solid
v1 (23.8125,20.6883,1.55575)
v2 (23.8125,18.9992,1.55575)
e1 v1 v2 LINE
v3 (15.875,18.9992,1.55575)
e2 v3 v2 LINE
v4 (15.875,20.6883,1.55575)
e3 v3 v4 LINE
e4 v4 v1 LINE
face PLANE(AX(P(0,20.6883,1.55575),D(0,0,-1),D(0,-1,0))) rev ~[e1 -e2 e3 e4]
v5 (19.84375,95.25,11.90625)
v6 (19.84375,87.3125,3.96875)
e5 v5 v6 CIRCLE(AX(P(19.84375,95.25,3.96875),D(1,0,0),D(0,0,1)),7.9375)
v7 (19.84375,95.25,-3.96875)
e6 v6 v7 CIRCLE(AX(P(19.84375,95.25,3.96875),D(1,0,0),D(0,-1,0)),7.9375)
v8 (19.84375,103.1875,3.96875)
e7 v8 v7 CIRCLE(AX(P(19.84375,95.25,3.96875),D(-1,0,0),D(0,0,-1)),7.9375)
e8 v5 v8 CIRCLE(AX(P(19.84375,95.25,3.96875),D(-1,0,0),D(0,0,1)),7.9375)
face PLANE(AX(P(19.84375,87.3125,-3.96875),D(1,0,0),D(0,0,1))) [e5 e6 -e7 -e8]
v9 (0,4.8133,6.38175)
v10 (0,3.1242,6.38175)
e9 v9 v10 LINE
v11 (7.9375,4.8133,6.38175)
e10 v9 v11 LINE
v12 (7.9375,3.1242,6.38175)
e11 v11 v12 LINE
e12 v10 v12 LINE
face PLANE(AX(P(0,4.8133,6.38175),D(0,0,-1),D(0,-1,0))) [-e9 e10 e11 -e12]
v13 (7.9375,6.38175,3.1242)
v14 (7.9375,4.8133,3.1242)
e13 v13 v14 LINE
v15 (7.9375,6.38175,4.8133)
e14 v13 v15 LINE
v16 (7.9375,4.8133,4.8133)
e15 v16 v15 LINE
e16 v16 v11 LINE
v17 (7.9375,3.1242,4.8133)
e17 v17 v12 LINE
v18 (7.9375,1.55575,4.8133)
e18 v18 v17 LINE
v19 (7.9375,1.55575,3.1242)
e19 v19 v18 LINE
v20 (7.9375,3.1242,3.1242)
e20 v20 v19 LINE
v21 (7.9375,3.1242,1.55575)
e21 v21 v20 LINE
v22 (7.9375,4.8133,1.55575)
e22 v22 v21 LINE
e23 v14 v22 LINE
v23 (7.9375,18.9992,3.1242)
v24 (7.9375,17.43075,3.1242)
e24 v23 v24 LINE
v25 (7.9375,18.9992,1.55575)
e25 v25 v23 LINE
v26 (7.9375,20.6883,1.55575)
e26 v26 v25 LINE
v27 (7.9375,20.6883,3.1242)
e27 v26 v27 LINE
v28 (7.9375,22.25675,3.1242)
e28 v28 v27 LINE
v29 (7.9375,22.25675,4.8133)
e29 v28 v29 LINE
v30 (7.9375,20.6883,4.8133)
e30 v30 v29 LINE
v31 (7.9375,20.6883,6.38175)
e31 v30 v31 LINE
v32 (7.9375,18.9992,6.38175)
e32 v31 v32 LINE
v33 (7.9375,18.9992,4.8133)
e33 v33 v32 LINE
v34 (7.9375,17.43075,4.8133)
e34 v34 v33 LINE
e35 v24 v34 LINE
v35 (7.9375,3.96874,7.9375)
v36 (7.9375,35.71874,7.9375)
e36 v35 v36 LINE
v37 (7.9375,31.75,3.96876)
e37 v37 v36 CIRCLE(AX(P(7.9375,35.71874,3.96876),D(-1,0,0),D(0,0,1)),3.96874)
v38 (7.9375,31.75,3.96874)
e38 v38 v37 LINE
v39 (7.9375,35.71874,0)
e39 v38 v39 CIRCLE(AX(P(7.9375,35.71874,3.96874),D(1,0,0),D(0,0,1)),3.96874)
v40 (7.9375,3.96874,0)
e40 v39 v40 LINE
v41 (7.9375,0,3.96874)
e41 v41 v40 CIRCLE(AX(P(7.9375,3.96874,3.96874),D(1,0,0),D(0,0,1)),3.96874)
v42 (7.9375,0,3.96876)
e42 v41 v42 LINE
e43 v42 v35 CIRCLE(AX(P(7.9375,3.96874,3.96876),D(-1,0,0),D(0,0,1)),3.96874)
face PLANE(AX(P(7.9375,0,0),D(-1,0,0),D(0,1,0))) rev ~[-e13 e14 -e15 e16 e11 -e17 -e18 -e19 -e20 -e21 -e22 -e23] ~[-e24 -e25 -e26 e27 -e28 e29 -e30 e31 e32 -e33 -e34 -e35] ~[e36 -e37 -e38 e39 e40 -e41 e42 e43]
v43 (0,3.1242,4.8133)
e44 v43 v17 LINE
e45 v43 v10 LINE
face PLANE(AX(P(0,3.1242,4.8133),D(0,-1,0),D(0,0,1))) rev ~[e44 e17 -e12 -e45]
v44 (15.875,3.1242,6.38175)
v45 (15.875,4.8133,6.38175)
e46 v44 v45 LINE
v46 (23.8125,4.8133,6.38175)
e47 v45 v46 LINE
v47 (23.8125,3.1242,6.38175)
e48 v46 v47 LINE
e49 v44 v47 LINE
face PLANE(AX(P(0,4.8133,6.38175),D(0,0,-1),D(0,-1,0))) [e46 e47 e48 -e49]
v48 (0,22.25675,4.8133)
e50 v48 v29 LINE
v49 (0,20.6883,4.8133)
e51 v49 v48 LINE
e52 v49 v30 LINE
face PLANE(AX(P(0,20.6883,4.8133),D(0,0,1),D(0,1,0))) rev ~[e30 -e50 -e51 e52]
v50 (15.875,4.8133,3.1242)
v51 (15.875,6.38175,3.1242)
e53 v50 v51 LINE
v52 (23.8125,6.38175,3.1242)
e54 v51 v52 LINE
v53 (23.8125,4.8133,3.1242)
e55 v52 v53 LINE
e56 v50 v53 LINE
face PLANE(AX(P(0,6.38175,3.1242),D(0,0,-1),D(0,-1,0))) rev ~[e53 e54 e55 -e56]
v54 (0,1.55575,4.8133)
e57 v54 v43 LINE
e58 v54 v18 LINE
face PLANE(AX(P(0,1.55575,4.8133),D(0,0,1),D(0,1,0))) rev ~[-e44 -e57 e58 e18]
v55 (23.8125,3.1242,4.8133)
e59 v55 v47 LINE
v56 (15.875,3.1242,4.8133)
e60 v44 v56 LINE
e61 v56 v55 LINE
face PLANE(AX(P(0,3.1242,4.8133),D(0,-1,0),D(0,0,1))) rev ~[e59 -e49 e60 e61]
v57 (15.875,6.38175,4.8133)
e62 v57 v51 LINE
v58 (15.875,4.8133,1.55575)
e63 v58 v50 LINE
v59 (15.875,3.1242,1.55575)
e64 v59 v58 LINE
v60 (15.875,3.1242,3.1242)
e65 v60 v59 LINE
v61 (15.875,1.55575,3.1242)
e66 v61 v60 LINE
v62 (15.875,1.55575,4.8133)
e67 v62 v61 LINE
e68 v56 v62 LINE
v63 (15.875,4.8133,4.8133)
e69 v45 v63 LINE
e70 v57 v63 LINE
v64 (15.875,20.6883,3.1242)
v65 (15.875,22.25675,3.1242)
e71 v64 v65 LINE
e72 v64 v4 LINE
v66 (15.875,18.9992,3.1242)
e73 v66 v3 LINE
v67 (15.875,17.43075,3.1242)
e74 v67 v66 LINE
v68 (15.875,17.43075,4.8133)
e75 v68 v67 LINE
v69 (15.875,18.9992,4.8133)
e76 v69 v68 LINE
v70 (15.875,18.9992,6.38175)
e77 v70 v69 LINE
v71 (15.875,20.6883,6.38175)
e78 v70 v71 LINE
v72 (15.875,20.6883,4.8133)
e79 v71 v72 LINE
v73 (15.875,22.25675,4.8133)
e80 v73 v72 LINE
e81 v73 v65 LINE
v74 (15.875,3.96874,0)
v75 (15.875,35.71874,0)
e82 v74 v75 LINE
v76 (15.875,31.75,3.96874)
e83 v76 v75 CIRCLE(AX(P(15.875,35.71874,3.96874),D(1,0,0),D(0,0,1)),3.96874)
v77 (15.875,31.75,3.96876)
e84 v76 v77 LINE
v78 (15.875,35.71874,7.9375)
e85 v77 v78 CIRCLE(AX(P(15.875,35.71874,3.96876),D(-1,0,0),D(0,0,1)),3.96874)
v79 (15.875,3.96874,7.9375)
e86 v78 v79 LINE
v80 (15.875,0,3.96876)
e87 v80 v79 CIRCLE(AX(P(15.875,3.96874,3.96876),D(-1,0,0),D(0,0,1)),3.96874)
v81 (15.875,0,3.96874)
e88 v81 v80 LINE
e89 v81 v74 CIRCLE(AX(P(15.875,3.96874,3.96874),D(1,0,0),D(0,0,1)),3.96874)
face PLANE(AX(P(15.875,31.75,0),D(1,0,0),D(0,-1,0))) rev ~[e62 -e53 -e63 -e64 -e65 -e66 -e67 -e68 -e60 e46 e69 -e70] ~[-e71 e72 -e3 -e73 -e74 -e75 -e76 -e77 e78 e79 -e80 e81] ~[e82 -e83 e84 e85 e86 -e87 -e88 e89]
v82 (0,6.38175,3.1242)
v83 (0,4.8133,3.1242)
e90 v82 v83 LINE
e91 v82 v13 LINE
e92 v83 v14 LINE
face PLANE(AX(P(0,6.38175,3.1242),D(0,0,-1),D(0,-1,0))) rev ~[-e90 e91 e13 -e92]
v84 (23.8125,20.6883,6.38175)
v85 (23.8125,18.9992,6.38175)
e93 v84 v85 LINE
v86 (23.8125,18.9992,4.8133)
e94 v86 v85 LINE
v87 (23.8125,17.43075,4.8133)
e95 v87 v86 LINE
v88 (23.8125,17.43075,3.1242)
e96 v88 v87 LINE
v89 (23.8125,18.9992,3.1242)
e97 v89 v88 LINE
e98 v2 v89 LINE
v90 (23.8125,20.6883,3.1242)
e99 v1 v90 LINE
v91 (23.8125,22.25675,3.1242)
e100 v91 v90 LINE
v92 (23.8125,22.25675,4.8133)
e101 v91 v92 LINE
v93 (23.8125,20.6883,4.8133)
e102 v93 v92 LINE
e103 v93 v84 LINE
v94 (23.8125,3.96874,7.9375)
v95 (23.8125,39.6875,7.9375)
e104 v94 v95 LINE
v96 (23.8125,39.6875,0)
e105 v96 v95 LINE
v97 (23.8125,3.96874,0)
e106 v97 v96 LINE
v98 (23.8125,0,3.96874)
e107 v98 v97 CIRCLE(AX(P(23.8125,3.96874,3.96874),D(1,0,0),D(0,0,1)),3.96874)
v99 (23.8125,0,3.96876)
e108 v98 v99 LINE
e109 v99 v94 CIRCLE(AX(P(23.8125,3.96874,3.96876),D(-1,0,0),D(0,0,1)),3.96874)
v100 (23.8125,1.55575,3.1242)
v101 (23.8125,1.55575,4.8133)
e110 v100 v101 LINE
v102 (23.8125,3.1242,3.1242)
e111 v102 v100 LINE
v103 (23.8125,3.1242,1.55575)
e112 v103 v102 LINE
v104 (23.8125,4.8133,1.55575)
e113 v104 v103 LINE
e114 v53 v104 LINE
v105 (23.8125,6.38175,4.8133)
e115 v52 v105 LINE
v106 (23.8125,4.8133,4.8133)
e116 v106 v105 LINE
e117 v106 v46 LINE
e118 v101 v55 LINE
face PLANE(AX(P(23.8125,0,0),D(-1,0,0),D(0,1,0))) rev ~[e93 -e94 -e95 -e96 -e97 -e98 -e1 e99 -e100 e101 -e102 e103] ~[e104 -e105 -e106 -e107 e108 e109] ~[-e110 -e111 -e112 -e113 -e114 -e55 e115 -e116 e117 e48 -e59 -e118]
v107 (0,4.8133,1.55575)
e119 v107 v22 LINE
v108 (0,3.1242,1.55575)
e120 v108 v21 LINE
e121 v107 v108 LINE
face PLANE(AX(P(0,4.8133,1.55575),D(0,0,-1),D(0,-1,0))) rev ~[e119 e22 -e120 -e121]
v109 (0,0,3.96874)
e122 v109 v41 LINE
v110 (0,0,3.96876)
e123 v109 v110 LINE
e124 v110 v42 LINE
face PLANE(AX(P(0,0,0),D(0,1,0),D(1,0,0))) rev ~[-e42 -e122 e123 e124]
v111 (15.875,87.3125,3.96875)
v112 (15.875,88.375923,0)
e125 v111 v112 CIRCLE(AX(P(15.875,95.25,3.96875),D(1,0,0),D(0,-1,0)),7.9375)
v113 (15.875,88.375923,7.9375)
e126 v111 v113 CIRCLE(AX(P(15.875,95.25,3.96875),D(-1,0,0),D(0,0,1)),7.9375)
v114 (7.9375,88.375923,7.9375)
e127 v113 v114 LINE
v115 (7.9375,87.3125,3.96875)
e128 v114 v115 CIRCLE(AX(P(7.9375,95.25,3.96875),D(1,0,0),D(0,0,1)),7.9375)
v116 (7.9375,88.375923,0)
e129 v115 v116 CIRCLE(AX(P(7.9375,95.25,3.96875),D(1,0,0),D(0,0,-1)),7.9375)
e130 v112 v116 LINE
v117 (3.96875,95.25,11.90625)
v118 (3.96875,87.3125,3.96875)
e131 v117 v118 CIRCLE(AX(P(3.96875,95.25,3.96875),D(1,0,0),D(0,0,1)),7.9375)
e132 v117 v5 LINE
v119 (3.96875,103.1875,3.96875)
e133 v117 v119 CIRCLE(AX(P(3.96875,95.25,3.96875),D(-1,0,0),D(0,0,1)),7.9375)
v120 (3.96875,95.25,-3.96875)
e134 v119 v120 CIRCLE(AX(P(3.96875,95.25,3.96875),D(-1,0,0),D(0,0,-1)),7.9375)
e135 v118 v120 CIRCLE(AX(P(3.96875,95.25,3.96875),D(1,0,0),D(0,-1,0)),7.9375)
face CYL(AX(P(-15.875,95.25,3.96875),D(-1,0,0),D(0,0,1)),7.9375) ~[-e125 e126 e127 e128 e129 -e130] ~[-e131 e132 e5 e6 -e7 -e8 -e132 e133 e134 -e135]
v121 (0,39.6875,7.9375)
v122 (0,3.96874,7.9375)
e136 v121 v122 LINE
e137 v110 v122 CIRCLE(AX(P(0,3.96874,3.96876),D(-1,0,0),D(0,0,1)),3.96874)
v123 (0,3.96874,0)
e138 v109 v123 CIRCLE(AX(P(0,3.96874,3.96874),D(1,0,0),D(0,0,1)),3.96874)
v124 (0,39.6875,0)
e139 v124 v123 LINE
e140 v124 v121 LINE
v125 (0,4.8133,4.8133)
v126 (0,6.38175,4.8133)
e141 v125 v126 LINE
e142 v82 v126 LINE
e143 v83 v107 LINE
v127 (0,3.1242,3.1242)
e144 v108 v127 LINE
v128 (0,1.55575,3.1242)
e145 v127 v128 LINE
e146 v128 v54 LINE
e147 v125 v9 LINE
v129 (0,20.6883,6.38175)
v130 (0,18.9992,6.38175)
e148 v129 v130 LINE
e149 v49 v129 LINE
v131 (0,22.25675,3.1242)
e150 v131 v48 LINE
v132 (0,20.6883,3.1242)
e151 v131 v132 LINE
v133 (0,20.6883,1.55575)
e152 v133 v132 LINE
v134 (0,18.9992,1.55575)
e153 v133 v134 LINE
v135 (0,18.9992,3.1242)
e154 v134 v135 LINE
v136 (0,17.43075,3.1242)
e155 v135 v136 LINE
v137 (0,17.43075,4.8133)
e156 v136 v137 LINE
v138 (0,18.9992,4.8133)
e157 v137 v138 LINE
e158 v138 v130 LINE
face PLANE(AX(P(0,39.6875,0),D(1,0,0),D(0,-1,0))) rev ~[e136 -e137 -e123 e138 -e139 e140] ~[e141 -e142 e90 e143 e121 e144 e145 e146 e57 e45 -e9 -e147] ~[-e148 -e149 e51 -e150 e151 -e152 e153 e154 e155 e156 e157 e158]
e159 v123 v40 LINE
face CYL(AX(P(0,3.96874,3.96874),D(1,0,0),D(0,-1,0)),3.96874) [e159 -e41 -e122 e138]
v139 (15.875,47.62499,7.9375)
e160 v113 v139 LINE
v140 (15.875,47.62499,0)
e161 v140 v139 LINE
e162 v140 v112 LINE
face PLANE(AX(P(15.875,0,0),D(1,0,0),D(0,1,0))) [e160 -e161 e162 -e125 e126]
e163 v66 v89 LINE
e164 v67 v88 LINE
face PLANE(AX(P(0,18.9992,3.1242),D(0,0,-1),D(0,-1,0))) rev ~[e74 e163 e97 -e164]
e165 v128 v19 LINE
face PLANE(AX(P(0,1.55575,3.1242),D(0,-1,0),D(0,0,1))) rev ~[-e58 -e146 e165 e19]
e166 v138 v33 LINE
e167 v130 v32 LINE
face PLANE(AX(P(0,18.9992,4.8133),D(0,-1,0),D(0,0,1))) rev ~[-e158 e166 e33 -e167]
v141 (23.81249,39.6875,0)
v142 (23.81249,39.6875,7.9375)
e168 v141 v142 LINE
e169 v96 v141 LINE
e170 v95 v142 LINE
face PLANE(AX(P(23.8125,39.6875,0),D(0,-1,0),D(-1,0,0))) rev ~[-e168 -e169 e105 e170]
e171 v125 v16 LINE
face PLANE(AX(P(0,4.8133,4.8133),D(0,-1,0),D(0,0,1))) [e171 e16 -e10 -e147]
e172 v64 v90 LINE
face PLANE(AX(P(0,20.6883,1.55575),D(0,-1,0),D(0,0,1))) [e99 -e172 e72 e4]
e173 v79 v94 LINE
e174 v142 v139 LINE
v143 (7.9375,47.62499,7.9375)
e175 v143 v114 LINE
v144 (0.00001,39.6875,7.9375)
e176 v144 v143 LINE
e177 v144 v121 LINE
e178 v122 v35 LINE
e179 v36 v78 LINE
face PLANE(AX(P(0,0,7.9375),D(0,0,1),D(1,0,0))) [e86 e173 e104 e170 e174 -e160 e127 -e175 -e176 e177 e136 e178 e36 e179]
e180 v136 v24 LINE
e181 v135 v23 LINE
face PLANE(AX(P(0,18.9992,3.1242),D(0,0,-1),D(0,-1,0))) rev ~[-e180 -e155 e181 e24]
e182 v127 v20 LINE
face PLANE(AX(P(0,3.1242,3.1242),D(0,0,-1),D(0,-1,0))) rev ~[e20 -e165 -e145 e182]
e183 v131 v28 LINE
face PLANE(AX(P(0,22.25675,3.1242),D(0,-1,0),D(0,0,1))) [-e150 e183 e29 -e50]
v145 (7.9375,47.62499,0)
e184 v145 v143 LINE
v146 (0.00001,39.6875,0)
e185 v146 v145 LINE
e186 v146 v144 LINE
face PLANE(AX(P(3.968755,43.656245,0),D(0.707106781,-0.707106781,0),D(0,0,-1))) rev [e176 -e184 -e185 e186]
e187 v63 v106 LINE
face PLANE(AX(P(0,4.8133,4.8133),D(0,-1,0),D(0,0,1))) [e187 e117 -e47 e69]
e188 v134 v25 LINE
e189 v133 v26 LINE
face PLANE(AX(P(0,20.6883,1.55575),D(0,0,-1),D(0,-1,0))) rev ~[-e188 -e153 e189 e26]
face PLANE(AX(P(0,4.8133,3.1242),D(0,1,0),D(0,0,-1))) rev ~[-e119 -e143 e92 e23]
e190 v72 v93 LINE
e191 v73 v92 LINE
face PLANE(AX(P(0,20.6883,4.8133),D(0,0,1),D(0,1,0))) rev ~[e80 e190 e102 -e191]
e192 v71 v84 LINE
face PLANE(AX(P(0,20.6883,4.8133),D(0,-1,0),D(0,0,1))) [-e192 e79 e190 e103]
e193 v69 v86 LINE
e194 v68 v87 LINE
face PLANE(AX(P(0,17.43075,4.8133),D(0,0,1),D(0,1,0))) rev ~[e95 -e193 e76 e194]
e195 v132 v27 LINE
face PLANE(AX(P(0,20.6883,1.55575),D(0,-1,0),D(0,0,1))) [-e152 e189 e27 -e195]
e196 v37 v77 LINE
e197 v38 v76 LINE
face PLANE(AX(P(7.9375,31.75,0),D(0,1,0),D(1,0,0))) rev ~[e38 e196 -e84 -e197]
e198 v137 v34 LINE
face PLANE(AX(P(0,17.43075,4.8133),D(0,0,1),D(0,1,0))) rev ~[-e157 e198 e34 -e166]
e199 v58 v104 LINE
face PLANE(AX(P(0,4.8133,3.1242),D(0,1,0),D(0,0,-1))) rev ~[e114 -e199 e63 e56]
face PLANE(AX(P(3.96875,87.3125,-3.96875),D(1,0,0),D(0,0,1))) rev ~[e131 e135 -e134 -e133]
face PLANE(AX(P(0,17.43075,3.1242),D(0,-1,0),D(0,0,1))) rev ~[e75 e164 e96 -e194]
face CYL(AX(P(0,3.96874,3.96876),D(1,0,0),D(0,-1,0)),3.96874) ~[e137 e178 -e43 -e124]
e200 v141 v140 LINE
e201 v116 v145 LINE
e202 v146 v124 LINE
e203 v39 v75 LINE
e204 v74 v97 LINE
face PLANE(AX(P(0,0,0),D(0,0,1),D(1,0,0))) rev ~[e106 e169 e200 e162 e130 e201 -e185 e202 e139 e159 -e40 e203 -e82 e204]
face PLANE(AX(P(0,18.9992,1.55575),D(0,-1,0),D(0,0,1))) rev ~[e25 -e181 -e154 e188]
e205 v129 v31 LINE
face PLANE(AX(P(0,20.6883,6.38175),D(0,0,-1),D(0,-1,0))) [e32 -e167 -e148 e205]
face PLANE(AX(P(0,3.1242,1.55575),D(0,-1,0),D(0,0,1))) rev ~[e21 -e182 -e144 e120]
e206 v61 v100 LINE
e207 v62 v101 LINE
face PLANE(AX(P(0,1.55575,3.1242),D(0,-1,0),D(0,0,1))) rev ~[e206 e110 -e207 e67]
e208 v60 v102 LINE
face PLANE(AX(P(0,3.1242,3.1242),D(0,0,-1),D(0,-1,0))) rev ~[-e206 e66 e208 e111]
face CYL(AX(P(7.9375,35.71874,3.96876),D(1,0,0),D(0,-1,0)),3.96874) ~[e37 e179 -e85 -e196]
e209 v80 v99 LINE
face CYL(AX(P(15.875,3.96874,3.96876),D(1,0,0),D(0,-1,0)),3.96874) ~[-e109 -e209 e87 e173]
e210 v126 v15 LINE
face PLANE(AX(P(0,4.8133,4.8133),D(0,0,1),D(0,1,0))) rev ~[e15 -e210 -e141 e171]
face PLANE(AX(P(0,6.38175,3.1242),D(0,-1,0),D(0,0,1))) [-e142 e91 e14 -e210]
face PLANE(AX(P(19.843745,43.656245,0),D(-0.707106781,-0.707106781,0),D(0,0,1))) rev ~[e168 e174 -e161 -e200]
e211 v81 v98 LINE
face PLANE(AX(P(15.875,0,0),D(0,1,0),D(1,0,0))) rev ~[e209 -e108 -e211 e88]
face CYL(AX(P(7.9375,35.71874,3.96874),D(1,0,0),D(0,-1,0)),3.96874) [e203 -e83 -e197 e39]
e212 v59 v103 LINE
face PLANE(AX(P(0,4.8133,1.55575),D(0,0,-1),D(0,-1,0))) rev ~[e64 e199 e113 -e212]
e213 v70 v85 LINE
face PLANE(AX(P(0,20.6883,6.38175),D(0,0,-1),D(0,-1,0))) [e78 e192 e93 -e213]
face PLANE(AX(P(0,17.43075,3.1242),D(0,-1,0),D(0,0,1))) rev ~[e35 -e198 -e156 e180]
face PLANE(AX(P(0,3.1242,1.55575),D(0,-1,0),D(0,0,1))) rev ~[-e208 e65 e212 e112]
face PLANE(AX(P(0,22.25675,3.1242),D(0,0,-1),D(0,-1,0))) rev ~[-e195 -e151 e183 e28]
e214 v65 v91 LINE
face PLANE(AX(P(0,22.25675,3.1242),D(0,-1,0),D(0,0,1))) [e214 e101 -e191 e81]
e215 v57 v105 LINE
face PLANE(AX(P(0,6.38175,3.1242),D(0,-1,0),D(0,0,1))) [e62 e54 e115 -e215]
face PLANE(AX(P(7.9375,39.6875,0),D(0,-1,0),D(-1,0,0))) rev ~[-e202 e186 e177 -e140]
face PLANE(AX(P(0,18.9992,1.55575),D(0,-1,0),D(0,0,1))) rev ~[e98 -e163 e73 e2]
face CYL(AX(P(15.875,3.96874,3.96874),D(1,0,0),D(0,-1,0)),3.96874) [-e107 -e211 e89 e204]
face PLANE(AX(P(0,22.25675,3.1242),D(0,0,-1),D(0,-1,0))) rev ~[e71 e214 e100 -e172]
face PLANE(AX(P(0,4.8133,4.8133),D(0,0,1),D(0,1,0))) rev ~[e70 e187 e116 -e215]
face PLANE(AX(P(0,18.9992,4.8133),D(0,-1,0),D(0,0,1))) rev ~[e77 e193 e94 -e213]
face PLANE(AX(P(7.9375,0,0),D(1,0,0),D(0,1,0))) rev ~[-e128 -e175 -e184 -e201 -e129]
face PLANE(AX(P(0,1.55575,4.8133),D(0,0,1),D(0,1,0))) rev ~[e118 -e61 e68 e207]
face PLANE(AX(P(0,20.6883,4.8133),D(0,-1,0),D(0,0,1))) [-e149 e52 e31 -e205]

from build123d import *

# Parameters (mm, degrees)
F1_DEPTH     = 7.9375
F2_R         = 3.96874
F3_W         = 1.56845
F3_H         = 1.6891
F3_W_2       = 1.6891
F3_H_2       = 1.56845
F4_DEPTH     = 130
F5_SIZE      = 7.93749
F6_W         = 15.875
F6_H         = 15.875
F7_DEPTH     = 15.875
F8_T1_DEPTH  = 55.5625
F8_T6_DEPTH  = 55.5625
F8_T12_DEPTH = 55.5625
F8_T18_DEPTH = 55.5625
F8_T25_DEPTH = 55.5625
F8_T31_DEPTH = 55.5625
F8_T37_DEPTH = 55.5625
F8_T43_DEPTH = 55.5625
F8_T49_DEPTH = 55.5625
F8_T56_DEPTH = 55.5625
F8_T62_DEPTH = 55.5625


# Not quite as in the source:
# - a fillet or chamfer that OpenCascade refuses, or shapes differently, is made with other operations: its cross-section is extruded or revolved along the edge and cut away or added
# - a fillet or chamfer is up to 0.001 mm smaller than in the source, because OpenCascade refuses the exact size
# - an extrude ends at something that could not be found from the text; its depth is read off the source's solid


with BuildPart() as f1:
    # F0 (on Top) → F1 (new body)
    with BuildSketch(Plane.XY):
        Polygon((0, 39.6875), (0, 0), (7.9375, 0), (7.9375, 31.75), (15.875, 31.75), (15.875, 0), (23.8125, 0), (23.8125, 39.6875), (15.875, 39.6875), (15.875, 87.3125), (7.9375, 87.3125), (7.9375, 39.6875), align=None)
    extrude(amount=F1_DEPTH)

    # F2 (radius 3.96875 in the source; OpenCascade refuses exactly that, so slightly less here)
    f2_edges = [f1.edges().sort_by_distance(p)[0] for p in [
        (3.96875, 0, 0),
        (3.96875, 0, 7.9375),
        (19.84375, 0, 7.9375),
        (19.84375, 0, 0),
        (11.90625, 31.75, 7.9375),
        (11.90625, 31.75, 0),
    ]]
    fillet(f2_edges, radius=F2_R)

    # F3 (on face) → F4 (cut, through all)
    with BuildSketch(Plane(origin=(0, 0, 0), x_dir=(0, -1, 0), z_dir=(-1, 0, 0))):
        with Locations((-2.339975, 3.96875)):
            Rectangle(F3_W, F3_H)
        with Locations((-3.96875, 2.339975)):
            Rectangle(F3_W_2, F3_H_2)
        with Locations((-3.96875, 3.96875)):
            Rectangle(F3_W_2, F3_H)
        with Locations((-5.597525, 3.96875)):
            Rectangle(F3_W, F3_H)
        with Locations((-3.96875, 5.597525)):
            Rectangle(F3_W_2, F3_H_2)
        with Locations((-19.84375, 2.339975)):
            Rectangle(F3_W_2, F3_H_2)
        with Locations((-21.472525, 3.96875)):
            Rectangle(F3_W, F3_H)
        with Locations((-19.84375, 3.96875)):
            Rectangle(F3_W_2, F3_H)
        with Locations((-18.214975, 3.96875)):
            Rectangle(F3_W, F3_H)
        with Locations((-19.84375, 5.597525)):
            Rectangle(F3_W_2, F3_H_2)
    extrude(amount=-F4_DEPTH, mode=Mode.SUBTRACT)

    # F5 (size 7.9375 in the source; OpenCascade refuses exactly that, so slightly less here)
    f5_edges = [f1.edges().sort_by_distance(p)[0] for p in [
        (7.9375, 39.6875, 3.96875),
        (15.875, 39.6875, 3.96875),
    ]]
    chamfer(f5_edges, length=F5_SIZE)

    # F6 (on face) → F7 (join)
    with BuildSketch(Plane(origin=(0, 87.3125, 0), x_dir=(-1, 0, 0), z_dir=(0, 1, 0))):
        with Locations((-11.90625, 3.96875)):
            Rectangle(F6_W, F6_H)
    extrude(amount=F7_DEPTH)

    # F8: fillet of radius 7.9375 on 4 edges, made by hand

    # F8_s2 → F8_t1 (cut)
    with BuildSketch(Plane.YZ.offset(-15.875)):
        with BuildLine():
            ThreePointArc((95.25, -3.96875), (100.8626600757, -1.6439100757), (103.1875, 3.96875))
            Line((103.1875, 3.96875), (103.1875, -3.96875))
            Line((103.1875, -3.96875), (95.25, -3.96875))
        make_face()
        with BuildLine():
            ThreePointArc((95.25, 11.90625), (100.8626600757, 9.5814100757), (103.1875, 3.96875))
            Line((103.1875, 3.96875), (103.1875, 11.90625))
            Line((103.1875, 11.90625), (95.25, 11.90625))
        make_face()
    extrude(amount=F8_T1_DEPTH, mode=Mode.SUBTRACT)


with BuildPart() as f8_tool4:
    # F8_s5 → F8_t6 (new body)
    with BuildSketch(Plane.YZ.offset(39.6875)):
        with BuildLine():
            ThreePointArc((95.25, -3.96875), (89.6373399243, -1.6439100757), (87.3125, 3.96875))
            Line((87.3125, 3.96875), (87.3125, -3.96875))
            Line((87.3125, -3.96875), (95.25, -3.96875))
        make_face()
    extrude(amount=-F8_T6_DEPTH)

    split(bisect_by=Plane.XY, keep=Keep.BOTTOM)

    split(bisect_by=Plane.YZ.offset(15.875), keep=Keep.TOP)


with BuildPart() as f1_1:
    add(f1.part)

    # F8_t3: cut F8_tool4
    add(f8_tool4.part, mode=Mode.SUBTRACT)


with BuildPart() as f8_tool10:
    # F8_s11 → F8_t12 (new body)
    with BuildSketch(Plane.YZ.offset(39.6875)):
        with BuildLine():
            ThreePointArc((95.25, -3.96875), (89.6373399243, -1.6439100757), (87.3125, 3.96875))
            Line((87.3125, 3.96875), (87.3125, -3.96875))
            Line((87.3125, -3.96875), (95.25, -3.96875))
        make_face()
    extrude(amount=-F8_T12_DEPTH)

    split(bisect_by=Plane.XY, keep=Keep.TOP)

    split(bisect_by=Plane.YZ.offset(15.875), keep=Keep.TOP)


with BuildPart() as f1_2:
    add(f1_1.part)

    # F8_t9: cut F8_tool10
    add(f8_tool10.part, mode=Mode.SUBTRACT)


with BuildPart() as f8_tool16:
    # F8_s17 → F8_t18 (new body)
    with BuildSketch(Plane.YZ.offset(39.6875)):
        with BuildLine():
            ThreePointArc((95.25, -3.96875), (89.6373399243, -1.6439100757), (87.3125, 3.96875))
            Line((87.3125, 3.96875), (87.3125, -3.96875))
            Line((87.3125, -3.96875), (95.25, -3.96875))
        make_face()
    extrude(amount=-F8_T18_DEPTH)

    split(bisect_by=Plane.XY, keep=Keep.BOTTOM)

    split(bisect_by=Plane.YZ.offset(7.9375), keep=Keep.TOP)

    split(bisect_by=Plane.YZ.offset(15.875), keep=Keep.BOTTOM)


with BuildPart() as f1_3:
    add(f1_2.part)

    # F8_t15: cut F8_tool16
    add(f8_tool16.part, mode=Mode.SUBTRACT)


with BuildPart() as f8_tool23:
    # F8_s24 → F8_t25 (new body)
    with BuildSketch(Plane.YZ.offset(39.6875)):
        with BuildLine():
            ThreePointArc((95.25, -3.96875), (89.6373399243, -1.6439100757), (87.3125, 3.96875))
            Line((87.3125, 3.96875), (87.3125, -3.96875))
            Line((87.3125, -3.96875), (95.25, -3.96875))
        make_face()
    extrude(amount=-F8_T25_DEPTH)

    split(bisect_by=Plane.XY, keep=Keep.BOTTOM)

    split(bisect_by=Plane.YZ.offset(7.9375), keep=Keep.BOTTOM)


with BuildPart() as f1_4:
    add(f1_3.part)

    # F8_t22: cut F8_tool23
    add(f8_tool23.part, mode=Mode.SUBTRACT)


with BuildPart() as f8_tool29:
    # F8_s30 → F8_t31 (new body)
    with BuildSketch(Plane.YZ.offset(39.6875)):
        with BuildLine():
            ThreePointArc((95.25, -3.96875), (89.6373399243, -1.6439100757), (87.3125, 3.96875))
            Line((87.3125, 3.96875), (87.3125, -3.96875))
            Line((87.3125, -3.96875), (95.25, -3.96875))
        make_face()
    extrude(amount=-F8_T31_DEPTH)

    split(bisect_by=Plane.XY, keep=Keep.TOP)

    split(bisect_by=Plane.YZ.offset(7.9375), keep=Keep.BOTTOM)


with BuildPart() as f1_5:
    add(f1_4.part)

    # F8_t28: cut F8_tool29
    add(f8_tool29.part, mode=Mode.SUBTRACT)


with BuildPart() as f8_tool35:
    # F8_s36 → F8_t37 (new body)
    with BuildSketch(Plane.YZ.offset(-15.875)):
        with BuildLine():
            ThreePointArc((95.25, 11.90625), (89.6373399243, 9.5814100757), (87.3125, 3.96875))
            Line((87.3125, 3.96875), (87.3125, 11.90625))
            Line((87.3125, 11.90625), (95.25, 11.90625))
        make_face()
    extrude(amount=F8_T37_DEPTH)

    split(bisect_by=Plane.YZ.offset(7.9375), keep=Keep.BOTTOM)

    split(bisect_by=Plane.XY.offset(7.9375), keep=Keep.TOP)


with BuildPart() as f1_6:
    add(f1_5.part)

    # F8_t34: cut F8_tool35
    add(f8_tool35.part, mode=Mode.SUBTRACT)


with BuildPart() as f8_tool41:
    # F8_s42 → F8_t43 (new body)
    with BuildSketch(Plane.YZ.offset(-15.875)):
        with BuildLine():
            ThreePointArc((95.25, 11.90625), (89.6373399243, 9.5814100757), (87.3125, 3.96875))
            Line((87.3125, 3.96875), (87.3125, 11.90625))
            Line((87.3125, 11.90625), (95.25, 11.90625))
        make_face()
    extrude(amount=F8_T43_DEPTH)

    split(bisect_by=Plane.YZ.offset(7.9375), keep=Keep.BOTTOM)

    split(bisect_by=Plane.XY.offset(7.9375), keep=Keep.BOTTOM)


with BuildPart() as f1_7:
    add(f1_6.part)

    # F8_t40: cut F8_tool41
    add(f8_tool41.part, mode=Mode.SUBTRACT)


with BuildPart() as f8_tool47:
    # F8_s48 → F8_t49 (new body)
    with BuildSketch(Plane.YZ.offset(-15.875)):
        with BuildLine():
            ThreePointArc((95.25, 11.90625), (89.6373399243, 9.5814100757), (87.3125, 3.96875))
            Line((87.3125, 3.96875), (87.3125, 11.90625))
            Line((87.3125, 11.90625), (95.25, 11.90625))
        make_face()
    extrude(amount=F8_T49_DEPTH)

    split(bisect_by=Plane.YZ.offset(7.9375), keep=Keep.TOP)

    split(bisect_by=Plane.XY.offset(7.9375), keep=Keep.TOP)

    split(bisect_by=Plane.YZ.offset(15.875), keep=Keep.BOTTOM)


with BuildPart() as f1_8:
    add(f1_7.part)

    # F8_t46: cut F8_tool47
    add(f8_tool47.part, mode=Mode.SUBTRACT)


with BuildPart() as f8_tool54:
    # F8_s55 → F8_t56 (new body)
    with BuildSketch(Plane.YZ.offset(-15.875)):
        with BuildLine():
            ThreePointArc((95.25, 11.90625), (89.6373399243, 9.5814100757), (87.3125, 3.96875))
            Line((87.3125, 3.96875), (87.3125, 11.90625))
            Line((87.3125, 11.90625), (95.25, 11.90625))
        make_face()
    extrude(amount=F8_T56_DEPTH)

    split(bisect_by=Plane.XY.offset(7.9375), keep=Keep.TOP)

    split(bisect_by=Plane.YZ.offset(15.875), keep=Keep.TOP)


with BuildPart() as f1_9:
    add(f1_8.part)

    # F8_t53: cut F8_tool54
    add(f8_tool54.part, mode=Mode.SUBTRACT)


with BuildPart() as f8_tool60:
    # F8_s61 → F8_t62 (new body)
    with BuildSketch(Plane.YZ.offset(-15.875)):
        with BuildLine():
            ThreePointArc((95.25, 11.90625), (89.6373399243, 9.5814100757), (87.3125, 3.96875))
            Line((87.3125, 3.96875), (87.3125, 11.90625))
            Line((87.3125, 11.90625), (95.25, 11.90625))
        make_face()
    extrude(amount=F8_T62_DEPTH)

    split(bisect_by=Plane.XY.offset(7.9375), keep=Keep.BOTTOM)

    split(bisect_by=Plane.YZ.offset(15.875), keep=Keep.TOP)


with BuildPart() as f1_10:
    add(f1_9.part)

    # F8_t59: cut F8_tool60
    add(f8_tool60.part, mode=Mode.SUBTRACT)


solid = f1_10.part
